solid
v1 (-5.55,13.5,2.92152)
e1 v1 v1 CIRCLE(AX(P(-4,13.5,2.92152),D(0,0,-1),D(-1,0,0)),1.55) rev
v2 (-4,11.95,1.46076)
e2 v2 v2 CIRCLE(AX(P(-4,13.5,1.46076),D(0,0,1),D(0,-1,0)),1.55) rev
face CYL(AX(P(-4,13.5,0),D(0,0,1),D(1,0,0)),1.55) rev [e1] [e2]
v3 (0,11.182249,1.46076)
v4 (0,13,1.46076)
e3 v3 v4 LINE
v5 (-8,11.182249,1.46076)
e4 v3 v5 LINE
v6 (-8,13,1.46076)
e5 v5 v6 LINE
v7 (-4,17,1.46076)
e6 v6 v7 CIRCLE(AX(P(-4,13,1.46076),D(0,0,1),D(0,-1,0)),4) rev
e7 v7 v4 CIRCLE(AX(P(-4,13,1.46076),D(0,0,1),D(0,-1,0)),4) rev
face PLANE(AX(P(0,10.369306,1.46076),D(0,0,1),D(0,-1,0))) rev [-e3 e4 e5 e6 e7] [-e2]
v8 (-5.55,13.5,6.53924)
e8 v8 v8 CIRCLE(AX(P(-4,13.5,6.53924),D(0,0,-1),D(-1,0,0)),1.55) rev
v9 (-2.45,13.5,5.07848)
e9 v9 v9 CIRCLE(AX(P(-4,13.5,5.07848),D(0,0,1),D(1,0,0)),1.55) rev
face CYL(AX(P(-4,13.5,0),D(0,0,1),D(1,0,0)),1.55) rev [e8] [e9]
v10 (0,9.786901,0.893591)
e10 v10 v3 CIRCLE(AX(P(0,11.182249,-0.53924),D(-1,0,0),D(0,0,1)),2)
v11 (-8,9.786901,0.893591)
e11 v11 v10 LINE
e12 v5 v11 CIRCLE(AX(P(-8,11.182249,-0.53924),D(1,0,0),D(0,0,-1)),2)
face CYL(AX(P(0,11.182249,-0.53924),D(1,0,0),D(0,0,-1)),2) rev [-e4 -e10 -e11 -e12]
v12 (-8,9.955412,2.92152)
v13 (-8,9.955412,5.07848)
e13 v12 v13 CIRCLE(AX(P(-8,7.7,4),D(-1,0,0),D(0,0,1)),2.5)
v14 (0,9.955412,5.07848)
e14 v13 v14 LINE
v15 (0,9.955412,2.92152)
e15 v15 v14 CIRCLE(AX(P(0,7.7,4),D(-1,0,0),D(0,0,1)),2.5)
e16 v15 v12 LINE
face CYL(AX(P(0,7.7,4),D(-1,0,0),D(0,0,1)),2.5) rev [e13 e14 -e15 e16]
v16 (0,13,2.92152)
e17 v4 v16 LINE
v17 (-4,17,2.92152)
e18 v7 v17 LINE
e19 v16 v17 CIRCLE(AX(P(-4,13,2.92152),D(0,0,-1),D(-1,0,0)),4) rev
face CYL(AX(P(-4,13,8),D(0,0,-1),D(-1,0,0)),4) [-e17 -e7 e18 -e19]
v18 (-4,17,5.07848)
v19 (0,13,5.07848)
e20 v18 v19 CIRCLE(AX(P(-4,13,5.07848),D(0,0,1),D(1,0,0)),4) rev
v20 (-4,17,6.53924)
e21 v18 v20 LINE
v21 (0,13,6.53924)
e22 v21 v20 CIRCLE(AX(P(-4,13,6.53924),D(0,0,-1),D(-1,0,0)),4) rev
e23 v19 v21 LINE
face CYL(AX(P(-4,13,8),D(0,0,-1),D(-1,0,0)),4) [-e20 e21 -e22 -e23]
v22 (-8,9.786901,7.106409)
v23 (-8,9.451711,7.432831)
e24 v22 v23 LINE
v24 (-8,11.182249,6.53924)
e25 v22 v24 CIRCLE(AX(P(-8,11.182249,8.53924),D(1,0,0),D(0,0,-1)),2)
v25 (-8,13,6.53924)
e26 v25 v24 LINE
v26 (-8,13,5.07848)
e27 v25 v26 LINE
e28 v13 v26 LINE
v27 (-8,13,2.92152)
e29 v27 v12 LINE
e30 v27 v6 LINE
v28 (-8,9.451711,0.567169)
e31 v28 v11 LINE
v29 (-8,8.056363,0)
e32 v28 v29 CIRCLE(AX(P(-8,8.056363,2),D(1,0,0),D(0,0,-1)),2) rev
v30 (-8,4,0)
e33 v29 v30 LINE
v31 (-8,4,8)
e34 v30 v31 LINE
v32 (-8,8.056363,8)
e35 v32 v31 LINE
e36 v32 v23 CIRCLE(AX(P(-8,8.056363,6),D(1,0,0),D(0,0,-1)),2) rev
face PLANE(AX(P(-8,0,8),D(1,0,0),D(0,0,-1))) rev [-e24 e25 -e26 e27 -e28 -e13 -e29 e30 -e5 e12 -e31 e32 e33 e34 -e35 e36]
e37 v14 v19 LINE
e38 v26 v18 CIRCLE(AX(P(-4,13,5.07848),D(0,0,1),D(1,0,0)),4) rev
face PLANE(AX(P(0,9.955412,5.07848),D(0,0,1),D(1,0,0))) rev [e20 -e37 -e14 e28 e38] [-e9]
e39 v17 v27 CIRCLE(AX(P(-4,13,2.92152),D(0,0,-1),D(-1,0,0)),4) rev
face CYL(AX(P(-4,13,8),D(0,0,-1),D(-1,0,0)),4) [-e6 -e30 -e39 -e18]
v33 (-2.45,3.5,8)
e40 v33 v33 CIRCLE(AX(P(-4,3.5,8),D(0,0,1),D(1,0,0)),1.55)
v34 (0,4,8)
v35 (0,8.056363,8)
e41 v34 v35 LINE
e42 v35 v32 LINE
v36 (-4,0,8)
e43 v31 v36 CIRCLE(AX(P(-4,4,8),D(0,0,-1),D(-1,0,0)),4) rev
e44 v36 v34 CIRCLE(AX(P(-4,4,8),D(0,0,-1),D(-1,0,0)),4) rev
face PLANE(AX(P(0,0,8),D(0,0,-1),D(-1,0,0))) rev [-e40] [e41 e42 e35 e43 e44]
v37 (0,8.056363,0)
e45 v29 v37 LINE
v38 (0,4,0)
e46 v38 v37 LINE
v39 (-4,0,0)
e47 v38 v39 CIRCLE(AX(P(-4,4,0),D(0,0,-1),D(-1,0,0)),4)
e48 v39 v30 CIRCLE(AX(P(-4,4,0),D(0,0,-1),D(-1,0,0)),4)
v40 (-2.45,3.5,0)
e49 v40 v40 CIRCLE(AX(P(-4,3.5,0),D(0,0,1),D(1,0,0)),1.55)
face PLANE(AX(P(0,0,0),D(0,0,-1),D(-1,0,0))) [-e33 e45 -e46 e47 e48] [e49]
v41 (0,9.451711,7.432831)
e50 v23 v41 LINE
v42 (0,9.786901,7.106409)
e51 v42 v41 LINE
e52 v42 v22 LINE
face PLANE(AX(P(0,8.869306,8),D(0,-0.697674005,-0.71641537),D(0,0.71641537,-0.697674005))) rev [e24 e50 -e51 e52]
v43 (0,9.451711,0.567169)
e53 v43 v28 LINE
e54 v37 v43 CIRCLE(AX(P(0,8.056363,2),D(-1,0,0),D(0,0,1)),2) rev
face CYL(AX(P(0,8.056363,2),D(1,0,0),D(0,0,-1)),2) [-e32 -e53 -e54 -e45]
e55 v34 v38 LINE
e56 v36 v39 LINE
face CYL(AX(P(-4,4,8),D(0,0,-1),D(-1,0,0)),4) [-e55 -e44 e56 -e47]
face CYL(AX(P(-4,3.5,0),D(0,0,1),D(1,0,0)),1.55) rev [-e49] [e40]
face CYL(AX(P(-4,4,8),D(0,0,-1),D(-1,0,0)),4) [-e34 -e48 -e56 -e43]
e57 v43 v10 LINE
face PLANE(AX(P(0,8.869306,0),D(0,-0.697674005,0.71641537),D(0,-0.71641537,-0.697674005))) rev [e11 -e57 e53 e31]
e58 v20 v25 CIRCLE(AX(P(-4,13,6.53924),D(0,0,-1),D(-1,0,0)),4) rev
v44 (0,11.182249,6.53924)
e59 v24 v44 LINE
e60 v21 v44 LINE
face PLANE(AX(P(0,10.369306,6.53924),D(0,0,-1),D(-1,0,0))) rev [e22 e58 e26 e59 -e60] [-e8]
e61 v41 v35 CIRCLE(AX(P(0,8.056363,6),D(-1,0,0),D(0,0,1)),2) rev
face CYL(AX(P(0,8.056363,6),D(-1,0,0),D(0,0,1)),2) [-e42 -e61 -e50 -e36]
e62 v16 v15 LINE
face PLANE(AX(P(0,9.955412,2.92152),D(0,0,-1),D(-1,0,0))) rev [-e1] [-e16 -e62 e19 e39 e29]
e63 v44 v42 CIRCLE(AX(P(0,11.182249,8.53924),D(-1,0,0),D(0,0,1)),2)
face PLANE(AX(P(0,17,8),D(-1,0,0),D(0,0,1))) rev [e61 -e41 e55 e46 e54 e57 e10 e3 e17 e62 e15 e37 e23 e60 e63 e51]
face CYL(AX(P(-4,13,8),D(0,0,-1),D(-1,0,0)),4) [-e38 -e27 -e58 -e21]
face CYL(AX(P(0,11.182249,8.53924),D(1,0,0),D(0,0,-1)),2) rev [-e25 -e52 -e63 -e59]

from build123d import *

# Parameters (mm, degrees)
SKETCH_1_W          = 8
SKETCH_1_H          = 17
EXTRUDE_2_DEPTH     = 8
FILLET_2_R          = 4
SKETCH_2_R          = 1.55
CUT_EXTRUDE_1_DEPTH = 8
SKETCH_3_R          = 2.5
CUT_EXTRUDE_2_DEPTH = 8
CUT_EXTRUDE_4_DEPTH = 8
CUT_EXTRUDE_5_DEPTH = 8
FILLET_3_R          = 2


with BuildPart() as part:
    # 草图1 → 凸台-拉伸2 (new body)
    with BuildSketch(Plane.XY):
        with Locations((-4, 8.5)):
            Rectangle(SKETCH_1_W, SKETCH_1_H)
    extrude(amount=EXTRUDE_2_DEPTH)

    # 圆角2
    fillet_2_edges = [part.edges().sort_by_distance(p)[0] for p in [
        (0, 0, 4),
        (-8, 0, 4),
        (0, 17, 4),
        (-8, 17, 4),
    ]]
    fillet(fillet_2_edges, radius=FILLET_2_R - 0.0001)  # a hair under: the kernel refuses the full size

    # 草图2 → 切除-拉伸1 (cut)
    with BuildSketch(Plane.XY.offset(8)):
        with Locations((-4, 13.5)):
            Circle(SKETCH_2_R)
        with Locations((-4, 3.5)):
            Circle(SKETCH_2_R)
    extrude(amount=-CUT_EXTRUDE_1_DEPTH, mode=Mode.SUBTRACT)

    # 草图3 → 切除-拉伸2 (cut)
    with BuildSketch(Plane.ZY.offset(8)):
        with Locations((4, 7.7)):
            Circle(SKETCH_3_R)
    extrude(amount=-CUT_EXTRUDE_2_DEPTH, mode=Mode.SUBTRACT)

    # 草图4 → 切除-拉伸4 (cut)
    with BuildSketch(Plane.ZY.offset(8)):
        with BuildLine():
            Line((2.921520253, 9.955411589), (2.921520253, 17))
            Line((2.921520253, 17), (5.078479747, 17))
            Line((5.078479747, 17), (5.078479747, 9.955411589))
            Line((5.078479747, 9.955411589), (5.078479747, 9.786617836))
            ThreePointArc((5.078479747, 9.786617836), (4, 10.033067636), (2.921520253, 9.786617836))
            Line((2.921520253, 9.786617836), (2.921520253, 9.955411589))
        make_face()
    extrude(amount=-CUT_EXTRUDE_4_DEPTH, mode=Mode.SUBTRACT)

    # 草图5 → 切除-拉伸5 (cut)
    with BuildSketch(Plane.ZY.offset(8)):
        Polygon((0, 8.869306394), (1.460760126, 10.369306394), (1.460760126, 17), (0, 17), align=None)
        Polygon((8, 17), (8, 8.869306394), (6.539239874, 10.369306394), (6.539239874, 17), align=None)
    extrude(amount=-CUT_EXTRUDE_5_DEPTH, mode=Mode.SUBTRACT)

    # 圆角3
    fillet_3_edges = [part.edges().sort_by_distance(p)[0] for p in [
        (-4, 10.369306394, 6.539239874),
        (-4, 8.869306394, 8),
        (-4, 8.869306394, 0),
        (-4, 10.369306394, 1.460760126),
    ]]
    fillet(fillet_3_edges, radius=FILLET_3_R)


solid = part.part
